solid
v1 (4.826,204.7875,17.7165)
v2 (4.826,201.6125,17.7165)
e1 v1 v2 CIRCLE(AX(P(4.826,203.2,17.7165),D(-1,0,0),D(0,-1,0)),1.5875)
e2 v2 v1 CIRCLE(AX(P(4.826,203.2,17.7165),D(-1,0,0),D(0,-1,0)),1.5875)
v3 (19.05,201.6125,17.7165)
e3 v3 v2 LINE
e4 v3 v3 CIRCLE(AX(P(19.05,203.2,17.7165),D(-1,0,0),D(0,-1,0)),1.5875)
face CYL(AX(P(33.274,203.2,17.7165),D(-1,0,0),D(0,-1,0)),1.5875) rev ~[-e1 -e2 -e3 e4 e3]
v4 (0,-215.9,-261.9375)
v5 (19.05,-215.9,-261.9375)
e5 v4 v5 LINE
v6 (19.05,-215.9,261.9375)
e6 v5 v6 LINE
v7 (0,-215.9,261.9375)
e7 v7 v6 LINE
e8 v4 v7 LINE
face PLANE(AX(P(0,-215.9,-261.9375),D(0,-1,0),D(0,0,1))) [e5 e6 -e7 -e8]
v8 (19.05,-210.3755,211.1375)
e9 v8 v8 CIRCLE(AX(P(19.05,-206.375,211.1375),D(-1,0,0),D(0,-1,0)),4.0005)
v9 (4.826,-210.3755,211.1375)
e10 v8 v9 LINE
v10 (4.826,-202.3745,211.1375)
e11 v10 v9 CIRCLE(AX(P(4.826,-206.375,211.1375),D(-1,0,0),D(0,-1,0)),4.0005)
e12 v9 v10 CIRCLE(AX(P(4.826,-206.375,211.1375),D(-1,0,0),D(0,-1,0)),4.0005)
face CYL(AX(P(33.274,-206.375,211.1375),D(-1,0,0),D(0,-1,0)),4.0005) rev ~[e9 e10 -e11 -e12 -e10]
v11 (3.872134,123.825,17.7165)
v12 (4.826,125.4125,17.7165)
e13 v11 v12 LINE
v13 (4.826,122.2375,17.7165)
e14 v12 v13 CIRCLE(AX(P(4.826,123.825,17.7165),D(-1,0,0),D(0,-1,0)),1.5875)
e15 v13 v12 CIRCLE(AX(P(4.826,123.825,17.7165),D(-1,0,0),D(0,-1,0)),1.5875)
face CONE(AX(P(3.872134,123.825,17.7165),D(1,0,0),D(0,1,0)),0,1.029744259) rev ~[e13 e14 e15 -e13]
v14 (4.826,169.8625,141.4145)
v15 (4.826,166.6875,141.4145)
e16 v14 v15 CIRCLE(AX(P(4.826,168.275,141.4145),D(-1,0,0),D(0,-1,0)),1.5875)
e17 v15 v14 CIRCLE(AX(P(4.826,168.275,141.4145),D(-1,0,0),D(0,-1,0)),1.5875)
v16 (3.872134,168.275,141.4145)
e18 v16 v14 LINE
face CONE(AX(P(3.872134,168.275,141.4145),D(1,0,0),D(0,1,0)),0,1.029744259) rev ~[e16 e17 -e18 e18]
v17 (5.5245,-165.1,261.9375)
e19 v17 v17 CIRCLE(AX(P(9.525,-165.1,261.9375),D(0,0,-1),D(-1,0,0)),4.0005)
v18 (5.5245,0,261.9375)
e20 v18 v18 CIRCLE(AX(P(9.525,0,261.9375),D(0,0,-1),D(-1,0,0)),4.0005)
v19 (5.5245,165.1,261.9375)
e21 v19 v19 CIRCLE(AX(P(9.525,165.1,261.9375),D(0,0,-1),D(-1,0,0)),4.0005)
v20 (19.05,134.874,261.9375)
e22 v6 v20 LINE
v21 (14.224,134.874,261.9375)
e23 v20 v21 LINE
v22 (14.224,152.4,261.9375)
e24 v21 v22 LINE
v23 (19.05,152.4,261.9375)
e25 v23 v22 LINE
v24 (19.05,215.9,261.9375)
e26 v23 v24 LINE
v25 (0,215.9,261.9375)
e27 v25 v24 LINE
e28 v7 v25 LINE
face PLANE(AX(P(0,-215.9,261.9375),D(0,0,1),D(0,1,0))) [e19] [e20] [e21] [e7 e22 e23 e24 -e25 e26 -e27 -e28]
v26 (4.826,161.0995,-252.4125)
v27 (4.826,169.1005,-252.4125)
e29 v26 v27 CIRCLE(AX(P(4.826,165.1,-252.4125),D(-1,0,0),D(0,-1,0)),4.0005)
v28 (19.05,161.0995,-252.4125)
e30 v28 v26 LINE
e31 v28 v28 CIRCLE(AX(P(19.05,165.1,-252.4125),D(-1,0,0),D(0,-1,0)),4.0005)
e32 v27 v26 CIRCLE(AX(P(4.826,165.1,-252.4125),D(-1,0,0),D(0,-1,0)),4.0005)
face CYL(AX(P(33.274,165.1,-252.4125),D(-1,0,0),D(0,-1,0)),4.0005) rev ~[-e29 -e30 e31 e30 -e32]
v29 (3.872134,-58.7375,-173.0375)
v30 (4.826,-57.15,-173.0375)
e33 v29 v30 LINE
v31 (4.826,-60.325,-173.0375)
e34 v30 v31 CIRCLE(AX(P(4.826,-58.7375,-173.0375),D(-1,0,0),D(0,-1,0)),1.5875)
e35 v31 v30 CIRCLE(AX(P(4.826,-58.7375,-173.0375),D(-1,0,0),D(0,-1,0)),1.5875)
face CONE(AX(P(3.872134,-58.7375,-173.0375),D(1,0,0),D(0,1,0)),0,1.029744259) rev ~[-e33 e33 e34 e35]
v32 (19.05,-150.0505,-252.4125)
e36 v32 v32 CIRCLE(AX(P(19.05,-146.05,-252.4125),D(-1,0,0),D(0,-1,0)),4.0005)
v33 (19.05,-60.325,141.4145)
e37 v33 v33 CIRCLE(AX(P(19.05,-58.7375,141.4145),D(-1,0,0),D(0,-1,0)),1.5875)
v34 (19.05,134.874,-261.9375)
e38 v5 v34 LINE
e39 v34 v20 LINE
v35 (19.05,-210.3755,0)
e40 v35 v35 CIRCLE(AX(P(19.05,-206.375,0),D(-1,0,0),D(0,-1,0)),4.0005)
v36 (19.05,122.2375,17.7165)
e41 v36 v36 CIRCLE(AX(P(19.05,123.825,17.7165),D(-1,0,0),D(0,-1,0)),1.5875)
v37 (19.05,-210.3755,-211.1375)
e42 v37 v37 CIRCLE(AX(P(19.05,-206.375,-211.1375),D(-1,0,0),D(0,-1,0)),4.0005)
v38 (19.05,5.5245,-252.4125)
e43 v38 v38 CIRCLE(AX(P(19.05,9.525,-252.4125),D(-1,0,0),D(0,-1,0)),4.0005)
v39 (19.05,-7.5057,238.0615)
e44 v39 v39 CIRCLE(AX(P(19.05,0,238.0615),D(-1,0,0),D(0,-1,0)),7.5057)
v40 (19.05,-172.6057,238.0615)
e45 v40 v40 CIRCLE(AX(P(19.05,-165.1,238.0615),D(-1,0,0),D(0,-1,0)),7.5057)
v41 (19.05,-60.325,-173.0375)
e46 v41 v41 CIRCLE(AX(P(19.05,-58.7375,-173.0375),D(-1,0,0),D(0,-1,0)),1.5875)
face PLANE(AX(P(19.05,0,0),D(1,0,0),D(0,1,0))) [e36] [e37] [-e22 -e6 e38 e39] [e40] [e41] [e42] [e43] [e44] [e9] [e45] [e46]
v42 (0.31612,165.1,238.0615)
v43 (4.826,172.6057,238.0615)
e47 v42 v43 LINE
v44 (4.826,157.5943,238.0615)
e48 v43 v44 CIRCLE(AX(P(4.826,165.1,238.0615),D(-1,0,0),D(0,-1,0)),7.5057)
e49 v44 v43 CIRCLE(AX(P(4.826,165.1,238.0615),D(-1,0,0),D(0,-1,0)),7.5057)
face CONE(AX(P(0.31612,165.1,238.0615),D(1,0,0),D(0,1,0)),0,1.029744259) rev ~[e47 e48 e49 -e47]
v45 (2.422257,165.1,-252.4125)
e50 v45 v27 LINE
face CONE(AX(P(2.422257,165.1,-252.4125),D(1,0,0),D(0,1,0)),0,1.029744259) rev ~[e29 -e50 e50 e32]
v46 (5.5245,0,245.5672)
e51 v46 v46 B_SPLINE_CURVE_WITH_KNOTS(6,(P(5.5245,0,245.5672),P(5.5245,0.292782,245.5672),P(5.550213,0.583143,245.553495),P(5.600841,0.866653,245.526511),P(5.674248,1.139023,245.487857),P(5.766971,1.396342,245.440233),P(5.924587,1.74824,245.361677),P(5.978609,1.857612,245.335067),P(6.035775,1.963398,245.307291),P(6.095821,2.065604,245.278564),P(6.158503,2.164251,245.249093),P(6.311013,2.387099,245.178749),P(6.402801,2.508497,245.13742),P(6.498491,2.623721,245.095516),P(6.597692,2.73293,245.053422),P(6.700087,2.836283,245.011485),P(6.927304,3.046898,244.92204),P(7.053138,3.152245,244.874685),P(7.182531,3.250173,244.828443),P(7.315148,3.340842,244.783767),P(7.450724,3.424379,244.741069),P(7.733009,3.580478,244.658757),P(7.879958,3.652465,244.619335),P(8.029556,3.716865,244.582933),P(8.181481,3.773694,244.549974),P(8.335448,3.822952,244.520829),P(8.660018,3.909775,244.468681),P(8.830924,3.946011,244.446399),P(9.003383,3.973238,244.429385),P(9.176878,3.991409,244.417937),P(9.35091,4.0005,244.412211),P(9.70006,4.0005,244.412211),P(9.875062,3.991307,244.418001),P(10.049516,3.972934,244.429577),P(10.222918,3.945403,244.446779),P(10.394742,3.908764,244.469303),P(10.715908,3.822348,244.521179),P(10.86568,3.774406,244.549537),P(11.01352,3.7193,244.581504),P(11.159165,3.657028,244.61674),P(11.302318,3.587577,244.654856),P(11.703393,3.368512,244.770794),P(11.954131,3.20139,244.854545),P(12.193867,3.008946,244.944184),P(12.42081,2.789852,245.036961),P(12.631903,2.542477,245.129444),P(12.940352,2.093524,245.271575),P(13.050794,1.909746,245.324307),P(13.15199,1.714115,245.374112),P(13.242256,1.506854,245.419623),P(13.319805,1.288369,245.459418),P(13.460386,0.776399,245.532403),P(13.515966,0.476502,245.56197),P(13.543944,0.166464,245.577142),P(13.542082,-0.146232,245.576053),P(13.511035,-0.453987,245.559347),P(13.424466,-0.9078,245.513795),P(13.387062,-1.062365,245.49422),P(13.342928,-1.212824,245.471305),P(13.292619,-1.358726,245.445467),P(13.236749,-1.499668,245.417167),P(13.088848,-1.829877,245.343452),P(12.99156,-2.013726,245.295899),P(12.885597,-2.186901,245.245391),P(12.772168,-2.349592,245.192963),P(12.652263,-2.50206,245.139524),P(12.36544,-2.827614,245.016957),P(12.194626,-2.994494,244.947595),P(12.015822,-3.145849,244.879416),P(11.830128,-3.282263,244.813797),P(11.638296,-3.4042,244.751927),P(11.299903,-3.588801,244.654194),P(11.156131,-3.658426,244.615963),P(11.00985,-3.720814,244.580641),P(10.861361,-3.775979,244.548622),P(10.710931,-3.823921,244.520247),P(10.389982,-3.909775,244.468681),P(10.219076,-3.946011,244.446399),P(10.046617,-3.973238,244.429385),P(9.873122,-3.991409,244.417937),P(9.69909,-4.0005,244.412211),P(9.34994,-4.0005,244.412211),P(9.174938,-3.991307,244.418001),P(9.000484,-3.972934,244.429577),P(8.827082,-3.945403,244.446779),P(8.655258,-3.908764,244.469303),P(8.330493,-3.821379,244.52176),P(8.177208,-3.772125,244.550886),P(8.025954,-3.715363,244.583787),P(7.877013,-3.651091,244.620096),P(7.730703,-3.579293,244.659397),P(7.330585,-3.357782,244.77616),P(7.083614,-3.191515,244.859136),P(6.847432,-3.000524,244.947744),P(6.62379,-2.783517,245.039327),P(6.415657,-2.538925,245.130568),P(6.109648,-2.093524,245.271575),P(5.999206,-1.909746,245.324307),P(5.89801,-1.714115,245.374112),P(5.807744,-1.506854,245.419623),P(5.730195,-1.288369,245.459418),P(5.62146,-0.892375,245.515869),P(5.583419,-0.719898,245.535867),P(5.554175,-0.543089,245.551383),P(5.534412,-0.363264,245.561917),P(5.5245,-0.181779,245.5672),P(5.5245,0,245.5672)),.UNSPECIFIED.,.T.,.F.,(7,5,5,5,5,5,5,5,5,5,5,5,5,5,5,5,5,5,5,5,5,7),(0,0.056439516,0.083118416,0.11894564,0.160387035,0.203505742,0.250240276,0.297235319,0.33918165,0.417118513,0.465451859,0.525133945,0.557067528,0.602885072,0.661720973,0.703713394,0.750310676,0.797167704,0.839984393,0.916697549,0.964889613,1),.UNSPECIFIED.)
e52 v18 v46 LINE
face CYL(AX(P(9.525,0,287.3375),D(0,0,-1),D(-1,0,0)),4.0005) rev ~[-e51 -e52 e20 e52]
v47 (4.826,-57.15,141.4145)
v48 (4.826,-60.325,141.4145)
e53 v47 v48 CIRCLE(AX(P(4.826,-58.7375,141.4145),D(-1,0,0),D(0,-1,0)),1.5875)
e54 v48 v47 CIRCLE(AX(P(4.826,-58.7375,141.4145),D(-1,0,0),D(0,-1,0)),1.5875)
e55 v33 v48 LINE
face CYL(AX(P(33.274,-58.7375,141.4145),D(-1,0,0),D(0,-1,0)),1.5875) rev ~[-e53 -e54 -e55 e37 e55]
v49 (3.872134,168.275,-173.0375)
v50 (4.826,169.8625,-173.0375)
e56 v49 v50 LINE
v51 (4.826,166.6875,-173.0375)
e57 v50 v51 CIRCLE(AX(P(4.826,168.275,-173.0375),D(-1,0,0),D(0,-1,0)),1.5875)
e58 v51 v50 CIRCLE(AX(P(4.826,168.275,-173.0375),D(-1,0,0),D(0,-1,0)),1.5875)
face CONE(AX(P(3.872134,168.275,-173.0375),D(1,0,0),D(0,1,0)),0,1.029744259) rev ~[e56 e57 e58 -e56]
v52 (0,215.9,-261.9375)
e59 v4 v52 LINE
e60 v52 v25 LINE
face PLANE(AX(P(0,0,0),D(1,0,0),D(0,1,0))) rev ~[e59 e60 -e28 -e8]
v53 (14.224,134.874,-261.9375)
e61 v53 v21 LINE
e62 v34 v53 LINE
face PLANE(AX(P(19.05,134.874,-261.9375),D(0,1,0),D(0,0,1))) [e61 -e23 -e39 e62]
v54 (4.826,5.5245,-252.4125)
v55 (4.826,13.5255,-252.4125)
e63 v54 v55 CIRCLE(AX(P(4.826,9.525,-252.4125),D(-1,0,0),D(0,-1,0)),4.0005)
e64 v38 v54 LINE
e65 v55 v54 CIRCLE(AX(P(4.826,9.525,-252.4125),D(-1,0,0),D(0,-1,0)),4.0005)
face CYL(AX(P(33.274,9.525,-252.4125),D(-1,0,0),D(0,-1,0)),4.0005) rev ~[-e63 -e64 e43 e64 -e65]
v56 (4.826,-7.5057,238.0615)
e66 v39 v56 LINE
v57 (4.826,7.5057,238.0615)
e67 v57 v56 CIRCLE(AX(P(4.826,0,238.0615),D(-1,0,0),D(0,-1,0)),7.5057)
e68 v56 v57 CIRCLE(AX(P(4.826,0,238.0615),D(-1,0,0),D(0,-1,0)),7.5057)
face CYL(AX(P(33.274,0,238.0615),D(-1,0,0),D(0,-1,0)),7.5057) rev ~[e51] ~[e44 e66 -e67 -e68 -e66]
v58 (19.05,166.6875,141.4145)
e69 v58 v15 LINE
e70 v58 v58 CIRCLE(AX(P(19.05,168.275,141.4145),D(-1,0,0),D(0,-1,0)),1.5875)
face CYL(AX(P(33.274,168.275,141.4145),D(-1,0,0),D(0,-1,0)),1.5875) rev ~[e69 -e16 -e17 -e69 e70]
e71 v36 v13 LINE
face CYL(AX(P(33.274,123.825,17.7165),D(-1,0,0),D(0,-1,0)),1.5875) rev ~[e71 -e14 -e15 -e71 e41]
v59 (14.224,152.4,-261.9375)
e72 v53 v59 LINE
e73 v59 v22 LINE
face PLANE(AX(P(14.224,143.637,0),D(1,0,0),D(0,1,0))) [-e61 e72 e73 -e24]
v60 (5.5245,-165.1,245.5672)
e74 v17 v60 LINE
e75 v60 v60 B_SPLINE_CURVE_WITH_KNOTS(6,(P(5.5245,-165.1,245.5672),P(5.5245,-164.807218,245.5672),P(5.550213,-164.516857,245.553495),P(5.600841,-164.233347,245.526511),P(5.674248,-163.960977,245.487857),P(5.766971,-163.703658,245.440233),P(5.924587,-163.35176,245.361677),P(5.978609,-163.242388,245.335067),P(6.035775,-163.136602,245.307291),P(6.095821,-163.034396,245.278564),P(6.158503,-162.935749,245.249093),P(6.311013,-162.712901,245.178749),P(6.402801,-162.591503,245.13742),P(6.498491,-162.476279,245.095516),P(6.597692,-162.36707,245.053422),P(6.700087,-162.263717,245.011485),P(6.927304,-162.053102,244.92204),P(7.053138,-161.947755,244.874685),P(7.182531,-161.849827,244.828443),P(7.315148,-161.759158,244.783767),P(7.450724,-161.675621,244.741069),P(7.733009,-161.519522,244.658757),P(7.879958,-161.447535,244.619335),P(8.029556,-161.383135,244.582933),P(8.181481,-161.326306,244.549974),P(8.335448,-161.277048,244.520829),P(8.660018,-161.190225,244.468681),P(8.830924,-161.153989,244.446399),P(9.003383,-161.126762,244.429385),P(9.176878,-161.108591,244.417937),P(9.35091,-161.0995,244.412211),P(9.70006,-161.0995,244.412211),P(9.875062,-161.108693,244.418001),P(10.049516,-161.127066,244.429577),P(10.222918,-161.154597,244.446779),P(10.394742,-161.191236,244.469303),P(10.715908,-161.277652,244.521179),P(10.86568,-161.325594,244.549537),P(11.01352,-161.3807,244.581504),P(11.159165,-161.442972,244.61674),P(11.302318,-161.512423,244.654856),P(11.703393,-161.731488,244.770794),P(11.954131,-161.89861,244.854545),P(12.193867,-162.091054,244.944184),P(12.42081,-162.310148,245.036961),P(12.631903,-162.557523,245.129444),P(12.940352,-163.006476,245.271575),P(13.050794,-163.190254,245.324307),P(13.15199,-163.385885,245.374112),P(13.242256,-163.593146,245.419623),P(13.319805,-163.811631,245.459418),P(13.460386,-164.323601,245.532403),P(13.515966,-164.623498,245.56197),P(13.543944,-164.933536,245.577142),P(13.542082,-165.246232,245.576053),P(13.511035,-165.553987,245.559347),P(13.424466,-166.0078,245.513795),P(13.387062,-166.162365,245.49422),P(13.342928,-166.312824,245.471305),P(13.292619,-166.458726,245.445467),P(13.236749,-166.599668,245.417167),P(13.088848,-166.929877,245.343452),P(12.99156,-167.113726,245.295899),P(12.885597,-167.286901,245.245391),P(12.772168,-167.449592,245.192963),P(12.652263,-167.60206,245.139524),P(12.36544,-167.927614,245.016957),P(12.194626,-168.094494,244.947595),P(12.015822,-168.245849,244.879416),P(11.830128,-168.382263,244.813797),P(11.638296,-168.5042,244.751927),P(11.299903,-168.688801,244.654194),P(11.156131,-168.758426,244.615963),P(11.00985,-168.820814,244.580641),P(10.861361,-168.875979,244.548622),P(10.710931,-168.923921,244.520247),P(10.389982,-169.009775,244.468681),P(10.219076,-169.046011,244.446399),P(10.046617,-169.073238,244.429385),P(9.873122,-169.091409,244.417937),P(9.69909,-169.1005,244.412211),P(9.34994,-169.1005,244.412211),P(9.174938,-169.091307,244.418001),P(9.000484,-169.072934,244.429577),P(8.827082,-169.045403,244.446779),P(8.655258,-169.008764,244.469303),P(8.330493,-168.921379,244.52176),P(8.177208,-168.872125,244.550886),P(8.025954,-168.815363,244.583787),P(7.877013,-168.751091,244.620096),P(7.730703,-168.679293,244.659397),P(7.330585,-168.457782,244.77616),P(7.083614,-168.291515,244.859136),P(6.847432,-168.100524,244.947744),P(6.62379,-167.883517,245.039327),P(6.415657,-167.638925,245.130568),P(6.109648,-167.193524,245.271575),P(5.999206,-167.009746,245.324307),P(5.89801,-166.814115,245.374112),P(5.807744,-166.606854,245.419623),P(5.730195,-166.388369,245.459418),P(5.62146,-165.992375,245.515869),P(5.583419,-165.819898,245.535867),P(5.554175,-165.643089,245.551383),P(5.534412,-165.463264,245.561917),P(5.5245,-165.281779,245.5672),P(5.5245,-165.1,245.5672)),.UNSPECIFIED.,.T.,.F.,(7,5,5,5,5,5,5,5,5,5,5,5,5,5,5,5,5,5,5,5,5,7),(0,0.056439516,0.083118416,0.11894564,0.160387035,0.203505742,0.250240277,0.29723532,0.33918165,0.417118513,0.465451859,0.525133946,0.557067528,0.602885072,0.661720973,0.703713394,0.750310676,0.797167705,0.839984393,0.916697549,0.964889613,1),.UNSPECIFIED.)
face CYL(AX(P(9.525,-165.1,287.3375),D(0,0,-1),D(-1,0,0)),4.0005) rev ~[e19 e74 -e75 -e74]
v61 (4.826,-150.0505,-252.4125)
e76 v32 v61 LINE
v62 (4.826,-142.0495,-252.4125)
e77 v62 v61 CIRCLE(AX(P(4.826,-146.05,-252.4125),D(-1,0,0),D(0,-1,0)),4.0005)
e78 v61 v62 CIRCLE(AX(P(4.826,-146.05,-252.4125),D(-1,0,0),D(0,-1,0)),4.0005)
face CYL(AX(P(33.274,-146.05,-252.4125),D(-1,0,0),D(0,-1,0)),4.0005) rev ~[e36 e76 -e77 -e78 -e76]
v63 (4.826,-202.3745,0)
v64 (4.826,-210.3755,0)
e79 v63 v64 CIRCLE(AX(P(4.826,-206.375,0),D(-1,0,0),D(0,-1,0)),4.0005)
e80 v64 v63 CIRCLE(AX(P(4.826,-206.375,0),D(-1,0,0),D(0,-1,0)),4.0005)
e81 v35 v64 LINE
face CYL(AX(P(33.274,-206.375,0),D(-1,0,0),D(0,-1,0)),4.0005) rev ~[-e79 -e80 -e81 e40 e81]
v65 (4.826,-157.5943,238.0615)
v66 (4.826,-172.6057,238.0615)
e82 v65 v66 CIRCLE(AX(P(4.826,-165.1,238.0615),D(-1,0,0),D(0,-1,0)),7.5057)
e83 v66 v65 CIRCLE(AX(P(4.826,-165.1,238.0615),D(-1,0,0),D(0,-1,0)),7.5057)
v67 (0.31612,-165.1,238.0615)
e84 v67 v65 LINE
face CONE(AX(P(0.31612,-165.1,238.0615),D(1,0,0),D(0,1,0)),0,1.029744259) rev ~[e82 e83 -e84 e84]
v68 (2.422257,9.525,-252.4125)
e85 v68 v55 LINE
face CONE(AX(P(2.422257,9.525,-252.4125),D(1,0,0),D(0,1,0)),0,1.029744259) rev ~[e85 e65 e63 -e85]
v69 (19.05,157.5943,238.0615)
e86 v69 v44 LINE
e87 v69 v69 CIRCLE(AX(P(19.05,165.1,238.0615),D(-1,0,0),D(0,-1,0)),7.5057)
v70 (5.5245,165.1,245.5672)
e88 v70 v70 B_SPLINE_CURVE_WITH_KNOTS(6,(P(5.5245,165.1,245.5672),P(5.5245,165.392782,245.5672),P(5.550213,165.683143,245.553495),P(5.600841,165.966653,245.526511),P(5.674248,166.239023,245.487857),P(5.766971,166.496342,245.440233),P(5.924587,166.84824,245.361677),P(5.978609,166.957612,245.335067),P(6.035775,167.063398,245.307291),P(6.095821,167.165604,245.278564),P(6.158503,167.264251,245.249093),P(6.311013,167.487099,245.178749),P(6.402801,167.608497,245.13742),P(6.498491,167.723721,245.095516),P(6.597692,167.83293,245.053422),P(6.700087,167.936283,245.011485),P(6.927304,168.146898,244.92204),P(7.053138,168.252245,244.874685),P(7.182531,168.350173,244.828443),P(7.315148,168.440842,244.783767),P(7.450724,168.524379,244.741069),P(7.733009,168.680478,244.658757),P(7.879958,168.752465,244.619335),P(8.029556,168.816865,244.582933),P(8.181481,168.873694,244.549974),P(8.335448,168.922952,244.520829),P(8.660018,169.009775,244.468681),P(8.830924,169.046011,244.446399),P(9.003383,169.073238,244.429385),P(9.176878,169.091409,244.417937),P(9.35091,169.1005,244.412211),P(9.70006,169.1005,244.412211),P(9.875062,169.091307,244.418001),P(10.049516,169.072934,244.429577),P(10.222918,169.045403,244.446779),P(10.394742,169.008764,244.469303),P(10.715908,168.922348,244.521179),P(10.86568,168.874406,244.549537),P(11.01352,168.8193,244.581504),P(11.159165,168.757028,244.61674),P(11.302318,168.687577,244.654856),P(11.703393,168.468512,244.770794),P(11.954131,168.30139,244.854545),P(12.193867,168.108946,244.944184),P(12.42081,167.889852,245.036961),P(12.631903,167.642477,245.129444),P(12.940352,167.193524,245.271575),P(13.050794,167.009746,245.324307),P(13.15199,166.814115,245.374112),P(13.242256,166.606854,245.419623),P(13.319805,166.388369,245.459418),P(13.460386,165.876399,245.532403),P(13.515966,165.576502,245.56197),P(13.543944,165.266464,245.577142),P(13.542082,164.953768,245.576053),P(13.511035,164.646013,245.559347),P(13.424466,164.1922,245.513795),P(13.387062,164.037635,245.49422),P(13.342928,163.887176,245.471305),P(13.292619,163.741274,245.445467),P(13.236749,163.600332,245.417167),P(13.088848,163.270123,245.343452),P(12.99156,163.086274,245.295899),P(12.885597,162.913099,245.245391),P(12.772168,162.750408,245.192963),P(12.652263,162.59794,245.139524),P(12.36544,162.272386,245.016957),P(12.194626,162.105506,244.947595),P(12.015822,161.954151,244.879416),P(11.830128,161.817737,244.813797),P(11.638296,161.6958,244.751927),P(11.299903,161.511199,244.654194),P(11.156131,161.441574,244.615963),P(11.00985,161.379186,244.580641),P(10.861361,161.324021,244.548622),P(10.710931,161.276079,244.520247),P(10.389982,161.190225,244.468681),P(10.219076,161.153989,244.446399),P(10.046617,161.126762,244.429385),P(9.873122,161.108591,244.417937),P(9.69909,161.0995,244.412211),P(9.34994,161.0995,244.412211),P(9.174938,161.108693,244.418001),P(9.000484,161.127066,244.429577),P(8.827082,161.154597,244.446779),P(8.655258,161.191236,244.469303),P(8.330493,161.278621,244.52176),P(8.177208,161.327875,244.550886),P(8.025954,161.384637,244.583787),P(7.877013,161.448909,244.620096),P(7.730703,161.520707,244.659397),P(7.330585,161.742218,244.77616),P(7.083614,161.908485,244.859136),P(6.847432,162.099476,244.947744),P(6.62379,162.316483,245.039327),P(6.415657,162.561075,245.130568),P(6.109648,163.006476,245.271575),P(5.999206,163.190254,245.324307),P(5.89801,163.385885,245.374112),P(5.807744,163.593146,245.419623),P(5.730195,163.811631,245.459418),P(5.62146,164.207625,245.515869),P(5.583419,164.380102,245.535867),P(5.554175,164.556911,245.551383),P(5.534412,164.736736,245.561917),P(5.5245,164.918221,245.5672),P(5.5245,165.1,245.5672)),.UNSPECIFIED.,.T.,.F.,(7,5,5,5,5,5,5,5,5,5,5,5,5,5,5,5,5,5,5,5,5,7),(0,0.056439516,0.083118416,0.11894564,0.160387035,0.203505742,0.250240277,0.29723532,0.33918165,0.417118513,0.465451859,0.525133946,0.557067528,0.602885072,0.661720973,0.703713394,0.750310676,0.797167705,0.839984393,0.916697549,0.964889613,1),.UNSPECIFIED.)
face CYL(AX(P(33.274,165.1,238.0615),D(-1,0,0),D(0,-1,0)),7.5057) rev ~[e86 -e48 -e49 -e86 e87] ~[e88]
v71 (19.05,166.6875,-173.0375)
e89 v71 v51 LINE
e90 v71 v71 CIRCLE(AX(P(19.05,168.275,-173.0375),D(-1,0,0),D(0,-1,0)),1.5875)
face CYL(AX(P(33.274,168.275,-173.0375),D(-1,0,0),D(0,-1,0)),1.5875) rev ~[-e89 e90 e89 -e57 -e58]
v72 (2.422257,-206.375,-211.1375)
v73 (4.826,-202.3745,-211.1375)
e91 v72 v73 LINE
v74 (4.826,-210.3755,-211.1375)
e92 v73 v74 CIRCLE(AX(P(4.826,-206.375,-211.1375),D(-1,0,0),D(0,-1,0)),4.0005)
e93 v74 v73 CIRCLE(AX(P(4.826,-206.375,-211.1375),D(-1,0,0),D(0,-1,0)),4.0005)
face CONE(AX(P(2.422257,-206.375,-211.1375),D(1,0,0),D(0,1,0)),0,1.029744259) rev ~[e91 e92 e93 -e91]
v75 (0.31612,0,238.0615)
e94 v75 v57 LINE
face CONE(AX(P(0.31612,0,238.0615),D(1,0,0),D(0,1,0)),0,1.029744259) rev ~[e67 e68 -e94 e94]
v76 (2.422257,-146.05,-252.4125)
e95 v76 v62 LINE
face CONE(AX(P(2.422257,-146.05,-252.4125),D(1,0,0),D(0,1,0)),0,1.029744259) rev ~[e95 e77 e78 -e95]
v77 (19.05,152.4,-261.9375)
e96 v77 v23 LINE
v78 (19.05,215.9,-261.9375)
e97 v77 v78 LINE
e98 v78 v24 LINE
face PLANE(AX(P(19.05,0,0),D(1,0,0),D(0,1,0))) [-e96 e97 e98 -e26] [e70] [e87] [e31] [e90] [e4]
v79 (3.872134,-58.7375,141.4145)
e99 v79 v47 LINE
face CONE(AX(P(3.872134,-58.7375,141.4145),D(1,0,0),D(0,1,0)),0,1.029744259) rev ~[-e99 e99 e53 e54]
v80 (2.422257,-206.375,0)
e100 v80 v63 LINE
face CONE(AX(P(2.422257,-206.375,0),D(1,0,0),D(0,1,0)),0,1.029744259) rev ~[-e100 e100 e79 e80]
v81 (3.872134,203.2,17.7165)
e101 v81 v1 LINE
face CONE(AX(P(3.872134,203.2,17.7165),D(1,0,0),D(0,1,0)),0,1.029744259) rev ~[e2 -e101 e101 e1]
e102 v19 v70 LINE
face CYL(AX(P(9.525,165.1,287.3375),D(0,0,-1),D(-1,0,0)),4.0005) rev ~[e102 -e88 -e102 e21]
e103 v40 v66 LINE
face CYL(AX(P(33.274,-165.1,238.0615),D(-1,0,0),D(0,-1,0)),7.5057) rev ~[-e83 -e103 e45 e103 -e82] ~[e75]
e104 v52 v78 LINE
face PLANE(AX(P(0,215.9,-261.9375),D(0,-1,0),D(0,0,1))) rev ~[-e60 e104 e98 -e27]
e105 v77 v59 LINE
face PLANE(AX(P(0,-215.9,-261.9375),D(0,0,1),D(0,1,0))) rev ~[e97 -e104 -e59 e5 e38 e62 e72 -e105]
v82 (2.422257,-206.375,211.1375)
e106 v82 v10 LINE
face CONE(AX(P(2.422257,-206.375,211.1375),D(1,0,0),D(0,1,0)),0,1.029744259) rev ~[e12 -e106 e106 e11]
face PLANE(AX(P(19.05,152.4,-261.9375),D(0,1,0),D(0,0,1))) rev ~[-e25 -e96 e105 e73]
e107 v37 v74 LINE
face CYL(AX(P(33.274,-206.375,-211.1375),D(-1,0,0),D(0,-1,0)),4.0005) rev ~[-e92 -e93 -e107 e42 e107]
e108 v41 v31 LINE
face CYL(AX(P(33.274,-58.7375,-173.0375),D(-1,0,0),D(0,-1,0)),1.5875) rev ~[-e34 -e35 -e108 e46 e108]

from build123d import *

# Parameters (mm, degrees)
F0_W      = 431.8
F0_H      = 523.875
F1_DEPTH  = 19.05
F3_D      = 8.001
F3_DEPTH  = 14.224
F3_TIP    = 2.4037429064
F4_D      = 15.0114
F4_DEPTH  = 14.224
F4_TIP    = 4.5098795482
F6_D      = 8.001
F6_DEPTH  = 25.4
F6_TIP    = 2.4037429064
F8_D      = 3.175
F8_DEPTH  = 14.224
F8_TIP    = 0.9538662327
F9_W      = 17.526
F9_H      = 523.875
F10_DEPTH = 4.826


with BuildPart() as f1:
    # F0 (on Right) → F1 (new body)
    with BuildSketch(Plane.YZ):
        Rectangle(F0_W, F0_H)
    extrude(amount=F1_DEPTH)

    # F3
    with Locations(Plane.YZ.offset(19.05)):
        with Locations((-206.375, 211.1375), (-206.375, 0), (-206.375, -211.1375), (-146.05, -252.4125), (9.525, -252.4125), (165.1, -252.4125)):
            Hole(F3_D / 2, depth=F3_DEPTH)
            with Locations((0, 0, -(F3_DEPTH + F3_TIP / 2))):  # 118° drill point
                Cone(0, F3_D / 2, F3_TIP, mode=Mode.SUBTRACT)

    # F4
    with Locations(Plane.YZ.offset(19.05)):
        with Locations((-165.1, 238.0615), (0, 238.0615), (165.1, 238.0615)):
            Hole(F4_D / 2, depth=F4_DEPTH)
            with Locations((0, 0, -(F4_DEPTH + F4_TIP / 2))):  # 118° drill point
                Cone(0, F4_D / 2, F4_TIP, mode=Mode.SUBTRACT)

    # F6
    with Locations(Plane.XY.offset(261.9375)):
        with Locations((9.525, 165.1), (9.525, 0), (9.525, -165.1)):
            Hole(F6_D / 2, depth=F6_DEPTH)
            with Locations((0, 0, -(F6_DEPTH + F6_TIP / 2))):  # 118° drill point
                Cone(0, F6_D / 2, F6_TIP, mode=Mode.SUBTRACT)

    # F8
    with Locations(Plane.YZ.offset(19.05)):
        with Locations((-58.7375, 141.4145), (168.275, 141.4145), (123.825, 17.7165), (203.2, 17.7165), (168.275, -173.0375), (-58.7375, -173.0375)):
            Hole(F8_D / 2, depth=F8_DEPTH)
            with Locations((0, 0, -(F8_DEPTH + F8_TIP / 2))):  # 118° drill point
                Cone(0, F8_D / 2, F8_TIP, mode=Mode.SUBTRACT)

    # F9 (on face) → F10 (cut)
    with BuildSketch(Plane.YZ.offset(19.05)):
        with Locations((143.637, 0)):
            Rectangle(F9_W, F9_H)
    extrude(amount=-F10_DEPTH, mode=Mode.SUBTRACT)


solid = f1.part
